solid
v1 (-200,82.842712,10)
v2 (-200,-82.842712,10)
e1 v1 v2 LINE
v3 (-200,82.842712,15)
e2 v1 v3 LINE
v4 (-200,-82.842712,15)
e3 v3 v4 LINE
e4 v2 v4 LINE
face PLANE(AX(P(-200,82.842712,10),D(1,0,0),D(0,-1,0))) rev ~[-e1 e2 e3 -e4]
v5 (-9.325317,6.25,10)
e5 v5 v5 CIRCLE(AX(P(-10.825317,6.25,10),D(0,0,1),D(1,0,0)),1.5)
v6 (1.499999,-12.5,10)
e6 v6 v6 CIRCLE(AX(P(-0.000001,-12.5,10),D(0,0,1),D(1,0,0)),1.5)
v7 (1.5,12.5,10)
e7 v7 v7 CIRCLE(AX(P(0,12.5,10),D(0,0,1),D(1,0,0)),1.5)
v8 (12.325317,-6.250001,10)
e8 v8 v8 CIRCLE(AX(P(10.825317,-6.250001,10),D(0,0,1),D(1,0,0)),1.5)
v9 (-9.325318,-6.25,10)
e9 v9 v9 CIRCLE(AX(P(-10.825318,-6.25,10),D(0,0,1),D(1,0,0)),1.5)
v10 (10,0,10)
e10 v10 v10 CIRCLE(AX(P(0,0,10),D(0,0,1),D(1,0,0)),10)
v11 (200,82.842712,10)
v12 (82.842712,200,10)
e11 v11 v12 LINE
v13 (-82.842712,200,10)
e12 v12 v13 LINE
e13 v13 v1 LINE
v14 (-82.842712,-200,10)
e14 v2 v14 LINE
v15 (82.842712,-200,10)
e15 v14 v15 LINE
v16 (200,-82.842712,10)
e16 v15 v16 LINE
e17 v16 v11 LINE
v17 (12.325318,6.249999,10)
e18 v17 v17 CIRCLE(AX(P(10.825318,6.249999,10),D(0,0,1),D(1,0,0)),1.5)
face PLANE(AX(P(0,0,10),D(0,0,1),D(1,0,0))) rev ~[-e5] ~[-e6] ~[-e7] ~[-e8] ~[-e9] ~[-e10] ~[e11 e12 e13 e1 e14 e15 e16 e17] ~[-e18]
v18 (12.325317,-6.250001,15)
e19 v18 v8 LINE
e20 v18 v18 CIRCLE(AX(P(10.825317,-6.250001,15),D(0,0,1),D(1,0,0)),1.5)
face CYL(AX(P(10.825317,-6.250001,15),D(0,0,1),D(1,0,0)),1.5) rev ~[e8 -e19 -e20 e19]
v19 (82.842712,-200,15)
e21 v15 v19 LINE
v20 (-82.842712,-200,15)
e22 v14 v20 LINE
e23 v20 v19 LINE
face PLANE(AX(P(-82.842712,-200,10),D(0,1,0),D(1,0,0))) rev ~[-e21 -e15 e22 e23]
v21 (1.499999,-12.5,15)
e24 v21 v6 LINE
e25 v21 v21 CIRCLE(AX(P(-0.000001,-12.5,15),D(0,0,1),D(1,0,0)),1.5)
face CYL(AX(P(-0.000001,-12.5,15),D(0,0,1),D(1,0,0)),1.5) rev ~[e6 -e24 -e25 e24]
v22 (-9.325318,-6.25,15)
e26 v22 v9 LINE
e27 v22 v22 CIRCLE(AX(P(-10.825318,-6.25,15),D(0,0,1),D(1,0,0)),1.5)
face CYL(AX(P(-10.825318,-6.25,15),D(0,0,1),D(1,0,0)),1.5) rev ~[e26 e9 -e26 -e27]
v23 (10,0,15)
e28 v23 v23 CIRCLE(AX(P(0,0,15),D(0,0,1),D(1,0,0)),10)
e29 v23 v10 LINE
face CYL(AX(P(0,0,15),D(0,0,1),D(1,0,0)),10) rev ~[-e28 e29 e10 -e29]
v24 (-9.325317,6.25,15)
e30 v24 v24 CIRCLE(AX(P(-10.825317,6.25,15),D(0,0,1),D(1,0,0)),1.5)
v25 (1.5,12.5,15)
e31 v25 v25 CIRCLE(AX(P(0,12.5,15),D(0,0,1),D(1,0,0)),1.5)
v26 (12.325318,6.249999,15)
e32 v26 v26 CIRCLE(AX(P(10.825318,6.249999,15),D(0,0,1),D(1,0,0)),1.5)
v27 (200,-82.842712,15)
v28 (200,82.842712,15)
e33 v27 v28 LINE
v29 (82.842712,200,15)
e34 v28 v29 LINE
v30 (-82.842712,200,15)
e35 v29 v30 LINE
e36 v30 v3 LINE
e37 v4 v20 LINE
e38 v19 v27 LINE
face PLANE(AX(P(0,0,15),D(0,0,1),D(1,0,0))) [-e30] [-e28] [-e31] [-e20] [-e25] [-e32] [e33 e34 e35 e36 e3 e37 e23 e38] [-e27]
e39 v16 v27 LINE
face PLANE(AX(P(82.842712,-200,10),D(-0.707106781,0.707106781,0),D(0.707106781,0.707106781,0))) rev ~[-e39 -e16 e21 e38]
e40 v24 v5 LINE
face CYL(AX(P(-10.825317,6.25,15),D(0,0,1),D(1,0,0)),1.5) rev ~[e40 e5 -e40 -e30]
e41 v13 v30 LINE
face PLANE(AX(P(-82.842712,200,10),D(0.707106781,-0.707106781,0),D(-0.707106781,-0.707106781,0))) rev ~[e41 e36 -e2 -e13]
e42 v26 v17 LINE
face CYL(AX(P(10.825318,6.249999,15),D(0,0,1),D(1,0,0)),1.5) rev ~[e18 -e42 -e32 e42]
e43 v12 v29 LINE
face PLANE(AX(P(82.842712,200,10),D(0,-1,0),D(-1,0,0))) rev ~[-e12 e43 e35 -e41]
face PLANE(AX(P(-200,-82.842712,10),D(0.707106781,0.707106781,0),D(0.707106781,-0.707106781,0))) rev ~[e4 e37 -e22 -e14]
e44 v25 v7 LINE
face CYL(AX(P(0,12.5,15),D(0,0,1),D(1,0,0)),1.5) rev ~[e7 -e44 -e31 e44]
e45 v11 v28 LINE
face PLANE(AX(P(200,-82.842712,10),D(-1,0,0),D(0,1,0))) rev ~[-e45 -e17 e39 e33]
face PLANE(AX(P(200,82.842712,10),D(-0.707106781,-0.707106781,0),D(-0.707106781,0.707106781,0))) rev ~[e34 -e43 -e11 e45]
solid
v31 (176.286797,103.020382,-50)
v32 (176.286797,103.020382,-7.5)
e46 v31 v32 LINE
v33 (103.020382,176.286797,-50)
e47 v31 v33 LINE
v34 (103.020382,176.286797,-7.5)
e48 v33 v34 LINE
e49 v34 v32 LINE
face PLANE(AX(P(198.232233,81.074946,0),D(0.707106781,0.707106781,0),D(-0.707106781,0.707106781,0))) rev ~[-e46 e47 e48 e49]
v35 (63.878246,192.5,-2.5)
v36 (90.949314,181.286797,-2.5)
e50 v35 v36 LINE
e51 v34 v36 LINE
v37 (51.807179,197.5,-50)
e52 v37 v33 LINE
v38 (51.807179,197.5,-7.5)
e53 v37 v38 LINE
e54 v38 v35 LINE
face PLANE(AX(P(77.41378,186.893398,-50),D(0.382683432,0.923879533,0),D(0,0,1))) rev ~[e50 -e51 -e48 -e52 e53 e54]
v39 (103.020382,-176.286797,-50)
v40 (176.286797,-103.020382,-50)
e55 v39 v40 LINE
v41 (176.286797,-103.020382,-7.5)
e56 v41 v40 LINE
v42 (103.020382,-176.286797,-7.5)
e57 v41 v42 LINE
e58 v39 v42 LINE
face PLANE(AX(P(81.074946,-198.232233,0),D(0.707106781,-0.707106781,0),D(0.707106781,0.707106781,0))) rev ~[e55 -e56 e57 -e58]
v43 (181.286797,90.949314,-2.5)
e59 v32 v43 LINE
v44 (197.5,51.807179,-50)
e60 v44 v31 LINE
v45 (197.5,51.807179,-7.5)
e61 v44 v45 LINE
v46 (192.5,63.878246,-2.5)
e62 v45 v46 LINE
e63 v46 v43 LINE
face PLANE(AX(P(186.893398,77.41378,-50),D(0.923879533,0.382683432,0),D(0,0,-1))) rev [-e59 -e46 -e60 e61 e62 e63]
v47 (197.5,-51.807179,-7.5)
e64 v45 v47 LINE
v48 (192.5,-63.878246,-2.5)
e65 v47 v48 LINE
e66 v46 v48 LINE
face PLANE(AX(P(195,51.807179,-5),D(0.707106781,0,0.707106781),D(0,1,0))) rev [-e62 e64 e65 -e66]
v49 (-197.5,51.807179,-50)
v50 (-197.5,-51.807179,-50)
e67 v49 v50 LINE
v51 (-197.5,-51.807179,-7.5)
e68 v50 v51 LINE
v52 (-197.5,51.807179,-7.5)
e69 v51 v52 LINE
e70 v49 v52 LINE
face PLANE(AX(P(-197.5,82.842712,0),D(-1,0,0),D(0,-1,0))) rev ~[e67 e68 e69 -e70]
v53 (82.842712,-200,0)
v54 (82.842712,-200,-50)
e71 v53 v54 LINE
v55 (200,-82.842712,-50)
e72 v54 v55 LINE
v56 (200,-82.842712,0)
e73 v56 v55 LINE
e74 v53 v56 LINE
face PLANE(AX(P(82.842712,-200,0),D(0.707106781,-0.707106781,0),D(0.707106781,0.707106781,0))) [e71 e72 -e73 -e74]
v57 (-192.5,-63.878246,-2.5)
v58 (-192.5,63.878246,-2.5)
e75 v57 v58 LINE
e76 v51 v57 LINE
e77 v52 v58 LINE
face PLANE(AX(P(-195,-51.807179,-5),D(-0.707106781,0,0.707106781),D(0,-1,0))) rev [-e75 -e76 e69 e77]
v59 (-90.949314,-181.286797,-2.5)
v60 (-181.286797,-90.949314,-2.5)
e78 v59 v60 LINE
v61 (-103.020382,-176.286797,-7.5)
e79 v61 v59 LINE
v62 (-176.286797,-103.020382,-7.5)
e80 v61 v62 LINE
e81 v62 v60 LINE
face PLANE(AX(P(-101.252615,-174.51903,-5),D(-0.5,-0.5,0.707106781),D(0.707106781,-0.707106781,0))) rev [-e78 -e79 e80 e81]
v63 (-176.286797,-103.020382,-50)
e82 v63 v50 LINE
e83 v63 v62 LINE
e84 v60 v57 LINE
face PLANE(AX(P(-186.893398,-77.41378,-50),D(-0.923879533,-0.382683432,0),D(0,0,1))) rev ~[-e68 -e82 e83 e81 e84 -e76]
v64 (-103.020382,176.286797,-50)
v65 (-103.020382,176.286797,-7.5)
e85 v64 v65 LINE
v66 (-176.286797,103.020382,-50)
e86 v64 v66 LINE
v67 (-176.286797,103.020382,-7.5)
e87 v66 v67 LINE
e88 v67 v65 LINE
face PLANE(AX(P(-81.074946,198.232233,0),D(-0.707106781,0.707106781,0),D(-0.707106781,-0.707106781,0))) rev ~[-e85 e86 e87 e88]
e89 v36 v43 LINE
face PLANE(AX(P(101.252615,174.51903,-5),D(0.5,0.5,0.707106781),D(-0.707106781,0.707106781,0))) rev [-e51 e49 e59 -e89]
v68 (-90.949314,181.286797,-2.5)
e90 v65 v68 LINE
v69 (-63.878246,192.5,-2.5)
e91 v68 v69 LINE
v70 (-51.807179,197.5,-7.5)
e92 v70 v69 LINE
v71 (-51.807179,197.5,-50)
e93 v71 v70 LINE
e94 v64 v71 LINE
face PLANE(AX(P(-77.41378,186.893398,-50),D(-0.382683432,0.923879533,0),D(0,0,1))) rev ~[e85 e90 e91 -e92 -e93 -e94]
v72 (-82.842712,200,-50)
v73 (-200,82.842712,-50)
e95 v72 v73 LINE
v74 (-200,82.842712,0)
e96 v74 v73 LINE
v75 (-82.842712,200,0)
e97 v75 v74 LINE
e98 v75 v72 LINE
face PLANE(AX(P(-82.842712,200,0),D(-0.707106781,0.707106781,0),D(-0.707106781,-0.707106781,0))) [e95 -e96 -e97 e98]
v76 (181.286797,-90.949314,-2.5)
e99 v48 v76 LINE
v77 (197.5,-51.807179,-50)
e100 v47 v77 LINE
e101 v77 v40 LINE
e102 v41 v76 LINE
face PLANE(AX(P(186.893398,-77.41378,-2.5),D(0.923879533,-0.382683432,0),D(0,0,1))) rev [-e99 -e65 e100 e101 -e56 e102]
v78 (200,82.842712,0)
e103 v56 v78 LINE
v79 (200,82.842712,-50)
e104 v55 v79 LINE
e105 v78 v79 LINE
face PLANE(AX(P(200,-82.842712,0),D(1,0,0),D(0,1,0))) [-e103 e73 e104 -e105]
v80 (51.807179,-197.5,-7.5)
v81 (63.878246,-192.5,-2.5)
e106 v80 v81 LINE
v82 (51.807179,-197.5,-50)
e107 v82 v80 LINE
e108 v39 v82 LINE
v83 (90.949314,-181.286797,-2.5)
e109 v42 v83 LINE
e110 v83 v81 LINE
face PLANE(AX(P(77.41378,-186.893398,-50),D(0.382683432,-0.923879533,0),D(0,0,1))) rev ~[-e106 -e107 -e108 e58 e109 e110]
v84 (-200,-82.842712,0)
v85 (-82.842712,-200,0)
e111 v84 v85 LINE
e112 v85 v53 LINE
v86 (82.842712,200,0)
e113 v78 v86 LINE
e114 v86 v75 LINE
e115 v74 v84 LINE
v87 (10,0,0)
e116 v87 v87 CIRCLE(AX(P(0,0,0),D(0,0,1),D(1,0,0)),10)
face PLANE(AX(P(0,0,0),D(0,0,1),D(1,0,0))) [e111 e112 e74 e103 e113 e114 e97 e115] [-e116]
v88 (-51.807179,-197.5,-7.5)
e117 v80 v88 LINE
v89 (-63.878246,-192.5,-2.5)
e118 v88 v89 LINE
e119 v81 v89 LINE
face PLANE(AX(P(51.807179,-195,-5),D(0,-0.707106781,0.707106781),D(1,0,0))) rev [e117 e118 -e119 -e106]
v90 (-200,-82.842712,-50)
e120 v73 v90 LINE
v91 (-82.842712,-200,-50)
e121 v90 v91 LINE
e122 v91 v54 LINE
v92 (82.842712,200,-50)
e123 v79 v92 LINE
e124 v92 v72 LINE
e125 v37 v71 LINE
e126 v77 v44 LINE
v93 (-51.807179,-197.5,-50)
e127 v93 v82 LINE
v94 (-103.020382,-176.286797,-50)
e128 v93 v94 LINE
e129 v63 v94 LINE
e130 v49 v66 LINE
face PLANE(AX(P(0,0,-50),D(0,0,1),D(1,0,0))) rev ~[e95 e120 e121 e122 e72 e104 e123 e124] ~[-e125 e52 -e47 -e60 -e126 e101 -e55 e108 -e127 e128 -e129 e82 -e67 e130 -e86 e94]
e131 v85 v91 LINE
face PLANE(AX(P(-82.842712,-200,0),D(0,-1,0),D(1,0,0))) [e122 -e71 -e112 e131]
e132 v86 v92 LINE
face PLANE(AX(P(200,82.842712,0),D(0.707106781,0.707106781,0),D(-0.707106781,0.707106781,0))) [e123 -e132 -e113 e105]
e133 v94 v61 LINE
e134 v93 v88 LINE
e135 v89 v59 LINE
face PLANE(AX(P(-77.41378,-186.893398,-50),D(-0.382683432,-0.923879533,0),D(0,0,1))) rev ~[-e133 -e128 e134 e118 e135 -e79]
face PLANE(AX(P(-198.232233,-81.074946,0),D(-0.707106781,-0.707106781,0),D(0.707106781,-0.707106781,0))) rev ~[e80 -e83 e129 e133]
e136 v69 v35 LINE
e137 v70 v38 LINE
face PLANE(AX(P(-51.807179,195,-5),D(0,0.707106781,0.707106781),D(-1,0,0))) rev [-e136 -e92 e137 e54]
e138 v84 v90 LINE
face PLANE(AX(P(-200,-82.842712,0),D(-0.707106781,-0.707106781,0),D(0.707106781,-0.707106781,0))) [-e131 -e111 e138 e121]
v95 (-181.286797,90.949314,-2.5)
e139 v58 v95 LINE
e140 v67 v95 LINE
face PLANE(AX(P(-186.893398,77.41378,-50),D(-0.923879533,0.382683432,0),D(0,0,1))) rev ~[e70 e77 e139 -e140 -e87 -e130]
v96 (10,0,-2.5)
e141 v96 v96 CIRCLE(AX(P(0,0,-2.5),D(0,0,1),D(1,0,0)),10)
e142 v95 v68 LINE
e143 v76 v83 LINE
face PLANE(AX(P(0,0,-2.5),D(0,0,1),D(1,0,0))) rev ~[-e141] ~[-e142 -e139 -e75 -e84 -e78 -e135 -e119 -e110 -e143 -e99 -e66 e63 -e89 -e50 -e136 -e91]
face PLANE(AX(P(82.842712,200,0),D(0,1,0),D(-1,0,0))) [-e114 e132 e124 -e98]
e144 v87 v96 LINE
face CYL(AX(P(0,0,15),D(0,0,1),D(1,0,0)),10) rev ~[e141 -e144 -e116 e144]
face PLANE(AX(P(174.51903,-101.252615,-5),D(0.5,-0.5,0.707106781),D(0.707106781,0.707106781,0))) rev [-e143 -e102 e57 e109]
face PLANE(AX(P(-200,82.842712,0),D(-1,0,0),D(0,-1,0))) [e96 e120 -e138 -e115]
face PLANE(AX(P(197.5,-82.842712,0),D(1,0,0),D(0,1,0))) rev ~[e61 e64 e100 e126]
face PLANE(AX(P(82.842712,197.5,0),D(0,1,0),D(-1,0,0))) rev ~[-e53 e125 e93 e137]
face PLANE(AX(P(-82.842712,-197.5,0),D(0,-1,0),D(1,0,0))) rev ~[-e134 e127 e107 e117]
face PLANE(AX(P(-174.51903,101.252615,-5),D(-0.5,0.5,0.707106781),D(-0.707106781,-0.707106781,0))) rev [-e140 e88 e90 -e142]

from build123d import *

# Parameters (mm, degrees)
F1_DEPTH = 50
F3_START = 10
F3_DEPTH = 5
F4_T     = -2.5
F5_R     = 10
F6_DEPTH = 65.001
F7_R     = 1.5
F8_DEPTH = 15
F9_SIZE  = 30
F10_SIZE = 5


with BuildPart() as f1:
    # F0 (on Top) → F1 (new body)
    with BuildSketch(Plane.XY):
        Polygon((200, -82.8427124746), (200, 82.8427124746), (82.8427124746, 200), (-82.8427124746, 200), (-200, 82.8427124746), (-200, -82.8427124746), (-82.8427124746, -200), (82.8427124746, -200), align=None)
    extrude(amount=-F1_DEPTH)

    # F4
    f4_openings = [f1.faces().sort_by_distance(p)[0] for p in [
        (0, 0, -50),
    ]]
    offset(amount=F4_T, openings=f4_openings)


with BuildPart() as f3:
    # F2 (on face) → F3 (new body)
    with BuildSketch(Plane.XY.offset(F3_START)):
        Polygon((82.8427124746, 200), (-82.8427124746, 200), (-200, 82.8427124746), (-200, -82.8427124746), (-82.8427124746, -200), (82.8427124746, -200), (200, -82.8427124746), (200, 82.8427124746), align=None)
    extrude(amount=F3_DEPTH)


with BuildPart() as f6_tool:
    # F5 (on face) → F6 (new body, through all)
    with BuildSketch(Plane.XY.offset(15)):
        Circle(F5_R)
    extrude(amount=-F6_DEPTH)


with BuildPart() as f1_1:
    add(f1.part)

    # F6: cut by f6_tool
    add(f6_tool.part, mode=Mode.SUBTRACT)

    # F9
    f9_edges = [f1_1.edges().sort_by_distance(p)[0] for p in [
        (-81.807179, -197.5, -26.25),
        (81.807179, -197.5, -26.25),
        (197.5, -81.807179, -26.25),
        (197.5, 81.807179, -26.25),
        (81.807179, 197.5, -26.25),
        (-81.807179, 197.5, -26.25),
        (-197.5, 81.807179, -26.25),
        (-197.5, -81.807179, -26.25),
    ]]
    chamfer(f9_edges, length=F9_SIZE)

    # F10
    f10_edges = [f1_1.edges().sort_by_distance(p)[0] for p in [
        (-139.653589, -139.653589, -2.5),
        (0, -197.5, -2.5),
        (139.653589, -139.653589, -2.5),
        (197.5, 0, -2.5),
        (139.653589, 139.653589, -2.5),
        (0, 197.5, -2.5),
        (-139.653589, 139.653589, -2.5),
        (-197.5, 0, -2.5),
    ]]
    chamfer(f10_edges, length=F10_SIZE)


with BuildPart() as f3_1:
    add(f3.part)

    # F6: cut by f6_tool
    add(f6_tool.part, mode=Mode.SUBTRACT)

    # F7 (on face) → F8 (cut)
    with BuildSketch(Plane.XY.offset(15)):
        with Locations((0, 12.5)):
            Circle(F7_R)
        with Locations((-10.8253174314, 6.2500002007)):
            Circle(F7_R)
        with Locations((-10.8253177791, -6.2499995985)):
            Circle(F7_R)
        with Locations((-6.954e-07, -12.5)):
            Circle(F7_R)
        with Locations((10.8253170837, -6.2500008029)):
            Circle(F7_R)
        with Locations((10.8253181268, 6.2499989963)):
            Circle(F7_R)
    extrude(amount=-F8_DEPTH, mode=Mode.SUBTRACT)


solid = Compound([f1_1.part, f3_1.part])
